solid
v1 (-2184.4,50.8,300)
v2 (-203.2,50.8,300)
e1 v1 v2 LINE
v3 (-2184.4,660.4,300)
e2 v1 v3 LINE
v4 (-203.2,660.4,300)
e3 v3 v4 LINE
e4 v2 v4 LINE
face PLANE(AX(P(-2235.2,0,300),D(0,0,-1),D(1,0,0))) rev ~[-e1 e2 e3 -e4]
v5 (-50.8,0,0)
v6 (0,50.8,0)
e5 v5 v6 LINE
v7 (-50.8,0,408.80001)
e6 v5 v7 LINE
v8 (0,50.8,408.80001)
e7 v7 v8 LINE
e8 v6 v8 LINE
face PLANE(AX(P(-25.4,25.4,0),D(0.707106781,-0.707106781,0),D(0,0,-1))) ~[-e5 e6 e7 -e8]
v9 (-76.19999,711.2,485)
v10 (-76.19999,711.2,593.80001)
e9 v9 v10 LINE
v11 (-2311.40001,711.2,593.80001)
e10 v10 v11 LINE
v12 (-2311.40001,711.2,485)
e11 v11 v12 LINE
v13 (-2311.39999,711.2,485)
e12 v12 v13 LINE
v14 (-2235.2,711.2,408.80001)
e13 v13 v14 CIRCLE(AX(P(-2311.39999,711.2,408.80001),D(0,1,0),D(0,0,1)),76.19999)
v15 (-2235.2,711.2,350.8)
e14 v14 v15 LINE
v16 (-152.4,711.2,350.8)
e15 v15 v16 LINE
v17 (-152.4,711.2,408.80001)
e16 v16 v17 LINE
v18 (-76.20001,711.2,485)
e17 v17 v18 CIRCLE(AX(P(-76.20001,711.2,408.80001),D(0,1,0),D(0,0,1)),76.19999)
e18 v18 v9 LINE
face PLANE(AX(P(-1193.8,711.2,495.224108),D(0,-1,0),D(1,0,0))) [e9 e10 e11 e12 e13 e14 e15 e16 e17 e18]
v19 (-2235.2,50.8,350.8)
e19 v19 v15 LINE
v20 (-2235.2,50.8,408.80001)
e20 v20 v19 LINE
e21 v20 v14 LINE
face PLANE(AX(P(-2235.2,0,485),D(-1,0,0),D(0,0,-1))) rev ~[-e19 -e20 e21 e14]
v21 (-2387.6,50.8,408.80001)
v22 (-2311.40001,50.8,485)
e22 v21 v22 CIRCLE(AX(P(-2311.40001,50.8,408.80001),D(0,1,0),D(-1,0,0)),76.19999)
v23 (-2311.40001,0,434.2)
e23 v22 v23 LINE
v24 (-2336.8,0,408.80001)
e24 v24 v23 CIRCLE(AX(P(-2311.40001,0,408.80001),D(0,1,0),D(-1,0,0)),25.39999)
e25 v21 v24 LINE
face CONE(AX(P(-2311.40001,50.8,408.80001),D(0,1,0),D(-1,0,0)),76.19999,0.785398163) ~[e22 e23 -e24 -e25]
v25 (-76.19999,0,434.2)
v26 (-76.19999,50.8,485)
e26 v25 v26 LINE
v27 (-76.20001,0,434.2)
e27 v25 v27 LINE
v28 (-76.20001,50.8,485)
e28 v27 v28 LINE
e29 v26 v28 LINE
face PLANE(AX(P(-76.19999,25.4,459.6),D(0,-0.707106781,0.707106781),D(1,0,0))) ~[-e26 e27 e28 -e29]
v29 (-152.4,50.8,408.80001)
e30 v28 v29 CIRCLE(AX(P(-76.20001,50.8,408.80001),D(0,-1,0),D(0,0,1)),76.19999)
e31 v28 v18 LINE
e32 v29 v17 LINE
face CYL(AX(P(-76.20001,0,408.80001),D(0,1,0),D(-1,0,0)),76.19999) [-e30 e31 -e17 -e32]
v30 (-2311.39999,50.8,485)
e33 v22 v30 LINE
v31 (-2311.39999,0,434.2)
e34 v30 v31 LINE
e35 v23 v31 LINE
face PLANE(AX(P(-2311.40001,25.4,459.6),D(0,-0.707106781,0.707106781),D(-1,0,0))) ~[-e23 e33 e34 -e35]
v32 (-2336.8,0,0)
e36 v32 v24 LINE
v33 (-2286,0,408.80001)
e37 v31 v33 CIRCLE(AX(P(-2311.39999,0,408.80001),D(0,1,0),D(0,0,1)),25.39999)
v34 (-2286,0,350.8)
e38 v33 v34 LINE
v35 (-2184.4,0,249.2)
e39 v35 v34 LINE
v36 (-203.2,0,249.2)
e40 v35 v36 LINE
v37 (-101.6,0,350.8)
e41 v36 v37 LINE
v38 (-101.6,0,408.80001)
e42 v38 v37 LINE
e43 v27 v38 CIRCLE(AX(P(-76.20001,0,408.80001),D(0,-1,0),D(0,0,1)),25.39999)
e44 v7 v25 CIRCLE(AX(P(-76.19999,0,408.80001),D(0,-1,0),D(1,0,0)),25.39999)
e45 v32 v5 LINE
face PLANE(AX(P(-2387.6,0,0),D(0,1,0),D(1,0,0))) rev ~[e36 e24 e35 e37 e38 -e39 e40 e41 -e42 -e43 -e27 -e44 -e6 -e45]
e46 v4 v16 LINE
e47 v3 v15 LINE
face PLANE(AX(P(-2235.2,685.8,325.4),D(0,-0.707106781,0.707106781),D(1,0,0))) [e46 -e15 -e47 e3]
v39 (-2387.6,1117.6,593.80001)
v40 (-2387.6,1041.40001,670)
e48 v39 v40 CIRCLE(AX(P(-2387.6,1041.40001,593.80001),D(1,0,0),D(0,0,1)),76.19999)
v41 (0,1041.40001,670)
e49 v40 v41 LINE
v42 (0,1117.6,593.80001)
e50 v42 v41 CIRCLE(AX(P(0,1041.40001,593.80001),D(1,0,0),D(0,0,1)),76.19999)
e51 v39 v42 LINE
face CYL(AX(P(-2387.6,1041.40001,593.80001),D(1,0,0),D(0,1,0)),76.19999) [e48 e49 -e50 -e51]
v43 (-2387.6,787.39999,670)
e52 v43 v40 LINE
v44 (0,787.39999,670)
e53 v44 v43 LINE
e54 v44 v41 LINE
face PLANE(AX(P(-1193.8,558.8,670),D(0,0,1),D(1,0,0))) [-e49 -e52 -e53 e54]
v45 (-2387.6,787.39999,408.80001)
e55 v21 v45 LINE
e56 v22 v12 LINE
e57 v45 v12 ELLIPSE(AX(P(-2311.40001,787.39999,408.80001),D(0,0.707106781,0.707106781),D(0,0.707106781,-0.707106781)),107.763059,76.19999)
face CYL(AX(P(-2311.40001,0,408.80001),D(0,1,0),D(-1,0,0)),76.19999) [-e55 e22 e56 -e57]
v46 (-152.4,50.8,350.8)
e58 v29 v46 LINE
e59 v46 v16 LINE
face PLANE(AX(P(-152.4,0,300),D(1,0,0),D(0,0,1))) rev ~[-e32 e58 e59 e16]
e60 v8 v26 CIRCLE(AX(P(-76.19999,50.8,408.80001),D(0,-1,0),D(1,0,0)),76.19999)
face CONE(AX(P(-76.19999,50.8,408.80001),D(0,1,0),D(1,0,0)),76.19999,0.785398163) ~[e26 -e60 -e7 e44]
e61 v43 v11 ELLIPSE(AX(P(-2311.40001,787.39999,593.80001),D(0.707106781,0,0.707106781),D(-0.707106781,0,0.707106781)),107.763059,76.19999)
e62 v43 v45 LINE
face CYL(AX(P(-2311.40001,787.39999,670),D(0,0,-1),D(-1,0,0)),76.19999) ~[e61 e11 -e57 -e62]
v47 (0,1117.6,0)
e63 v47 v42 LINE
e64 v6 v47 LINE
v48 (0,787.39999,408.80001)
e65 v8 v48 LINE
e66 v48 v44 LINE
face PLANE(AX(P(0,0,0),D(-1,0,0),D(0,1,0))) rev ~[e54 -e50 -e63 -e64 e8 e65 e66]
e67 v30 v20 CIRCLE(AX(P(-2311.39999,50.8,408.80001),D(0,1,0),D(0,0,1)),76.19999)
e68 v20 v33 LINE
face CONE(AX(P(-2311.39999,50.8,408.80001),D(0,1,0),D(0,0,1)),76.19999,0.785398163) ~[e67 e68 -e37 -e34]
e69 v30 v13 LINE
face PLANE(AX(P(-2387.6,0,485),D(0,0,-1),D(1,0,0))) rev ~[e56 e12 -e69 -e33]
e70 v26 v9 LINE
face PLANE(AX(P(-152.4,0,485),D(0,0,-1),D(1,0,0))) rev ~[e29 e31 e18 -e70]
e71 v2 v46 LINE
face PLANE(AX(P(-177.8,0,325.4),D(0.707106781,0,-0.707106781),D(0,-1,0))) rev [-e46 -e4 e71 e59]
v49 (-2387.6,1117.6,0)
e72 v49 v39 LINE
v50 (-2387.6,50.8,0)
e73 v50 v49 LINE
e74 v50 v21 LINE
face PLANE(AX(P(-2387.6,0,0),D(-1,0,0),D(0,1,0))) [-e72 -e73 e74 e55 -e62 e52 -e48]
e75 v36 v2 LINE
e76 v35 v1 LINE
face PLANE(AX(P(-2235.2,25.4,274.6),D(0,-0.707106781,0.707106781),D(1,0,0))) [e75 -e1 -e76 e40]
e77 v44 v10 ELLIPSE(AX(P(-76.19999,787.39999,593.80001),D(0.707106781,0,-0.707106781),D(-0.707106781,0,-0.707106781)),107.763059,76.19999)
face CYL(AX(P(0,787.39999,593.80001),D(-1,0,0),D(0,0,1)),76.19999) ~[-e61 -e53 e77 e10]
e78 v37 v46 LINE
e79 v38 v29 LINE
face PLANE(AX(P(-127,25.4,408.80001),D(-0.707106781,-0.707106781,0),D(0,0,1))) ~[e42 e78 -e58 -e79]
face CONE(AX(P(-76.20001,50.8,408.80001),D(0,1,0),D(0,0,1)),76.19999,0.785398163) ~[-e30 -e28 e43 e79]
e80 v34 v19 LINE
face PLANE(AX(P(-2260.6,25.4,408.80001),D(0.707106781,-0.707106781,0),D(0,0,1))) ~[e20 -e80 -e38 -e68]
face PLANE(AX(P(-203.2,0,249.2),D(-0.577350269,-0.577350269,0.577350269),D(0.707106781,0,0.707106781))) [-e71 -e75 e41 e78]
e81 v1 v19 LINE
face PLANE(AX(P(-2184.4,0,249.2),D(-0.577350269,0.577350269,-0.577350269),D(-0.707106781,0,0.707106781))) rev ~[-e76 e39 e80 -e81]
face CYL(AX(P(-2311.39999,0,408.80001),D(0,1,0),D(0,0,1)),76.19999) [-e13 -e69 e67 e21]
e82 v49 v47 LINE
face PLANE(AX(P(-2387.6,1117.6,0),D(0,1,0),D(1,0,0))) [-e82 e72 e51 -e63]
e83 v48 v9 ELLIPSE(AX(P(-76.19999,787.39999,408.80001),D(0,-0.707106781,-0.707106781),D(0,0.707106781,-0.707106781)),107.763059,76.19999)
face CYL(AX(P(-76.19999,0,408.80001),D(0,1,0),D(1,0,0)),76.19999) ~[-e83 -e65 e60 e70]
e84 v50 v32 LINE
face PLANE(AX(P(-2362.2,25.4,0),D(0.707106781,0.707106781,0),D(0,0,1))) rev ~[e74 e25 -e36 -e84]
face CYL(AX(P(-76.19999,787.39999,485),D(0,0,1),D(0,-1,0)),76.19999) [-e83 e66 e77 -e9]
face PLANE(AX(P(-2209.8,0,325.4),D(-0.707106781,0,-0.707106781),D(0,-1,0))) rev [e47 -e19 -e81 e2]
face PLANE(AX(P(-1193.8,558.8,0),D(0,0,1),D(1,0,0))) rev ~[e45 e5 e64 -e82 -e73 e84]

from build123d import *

# Parameters (mm, degrees)
F0_W     = 2387.6
F0_H     = 1117.6
F1_DEPTH = 670
F3_DEPTH = 711.2
F4_R     = 76.19999
F5_SIZE  = 50.8


# Not quite as in the source:
# - a fillet or chamfer is up to 0.001 mm smaller than in the source, because OpenCascade refuses the exact size


with BuildPart() as f1:
    # F0 (on Top) → F1 (new body)
    with BuildSketch(Plane.XY):
        with Locations((-1193.8, 558.8)):
            Rectangle(F0_W, F0_H)
    extrude(amount=F1_DEPTH)

    # F2 (on face) → F3 (cut)
    with BuildSketch(Plane.XZ):
        Polygon((-2235.2, 300), (-152.4, 300), (-152.4, 485), (0, 485), (0, 670), (-152.4, 670), (-2235.2, 670), (-2387.6, 670), (-2387.6, 485), (-2235.2, 485), align=None)
    extrude(amount=-F3_DEPTH, mode=Mode.SUBTRACT)

    # F4 (radius 76.2 in the source; OpenCascade refuses exactly that, so slightly less here)
    f4_edges = [f1.edges().sort_by_distance(p)[0] for p in [
        (-2235.2, 355.6, 485),
        (-1193.8, 711.2, 670),
        (-152.4, 355.6, 485),
        (0, 355.6, 485),
        (-1193.8, 1117.6, 670),
        (-2387.6, 355.6, 485),
        (-2387.6, 711.2, 577.5),
        (0, 711.2, 577.5),
    ]]
    fillet(f4_edges, radius=F4_R)

    # F5
    f5_edges = [f1.edges().sort_by_distance(p)[0] for p in [
        (-1193.8, 711.2, 300),
        (-2235.2, 355.6, 300),
        (-152.4, 355.6, 300),
        (-1193.8, 0, 300),
        (0, 0, 204.400005),
        (-22.31846, 0, 462.68154),
        (-76.2, 0, 485),
        (-2387.6, 0, 204.400005),
        (-130.08154, 0, 462.68154),
        (-2365.28154, 0, 462.68154),
        (-2311.4, 0, 485),
        (-2257.51846, 0, 462.68154),
    ]]
    chamfer(f5_edges, length=F5_SIZE)


solid = f1.part
